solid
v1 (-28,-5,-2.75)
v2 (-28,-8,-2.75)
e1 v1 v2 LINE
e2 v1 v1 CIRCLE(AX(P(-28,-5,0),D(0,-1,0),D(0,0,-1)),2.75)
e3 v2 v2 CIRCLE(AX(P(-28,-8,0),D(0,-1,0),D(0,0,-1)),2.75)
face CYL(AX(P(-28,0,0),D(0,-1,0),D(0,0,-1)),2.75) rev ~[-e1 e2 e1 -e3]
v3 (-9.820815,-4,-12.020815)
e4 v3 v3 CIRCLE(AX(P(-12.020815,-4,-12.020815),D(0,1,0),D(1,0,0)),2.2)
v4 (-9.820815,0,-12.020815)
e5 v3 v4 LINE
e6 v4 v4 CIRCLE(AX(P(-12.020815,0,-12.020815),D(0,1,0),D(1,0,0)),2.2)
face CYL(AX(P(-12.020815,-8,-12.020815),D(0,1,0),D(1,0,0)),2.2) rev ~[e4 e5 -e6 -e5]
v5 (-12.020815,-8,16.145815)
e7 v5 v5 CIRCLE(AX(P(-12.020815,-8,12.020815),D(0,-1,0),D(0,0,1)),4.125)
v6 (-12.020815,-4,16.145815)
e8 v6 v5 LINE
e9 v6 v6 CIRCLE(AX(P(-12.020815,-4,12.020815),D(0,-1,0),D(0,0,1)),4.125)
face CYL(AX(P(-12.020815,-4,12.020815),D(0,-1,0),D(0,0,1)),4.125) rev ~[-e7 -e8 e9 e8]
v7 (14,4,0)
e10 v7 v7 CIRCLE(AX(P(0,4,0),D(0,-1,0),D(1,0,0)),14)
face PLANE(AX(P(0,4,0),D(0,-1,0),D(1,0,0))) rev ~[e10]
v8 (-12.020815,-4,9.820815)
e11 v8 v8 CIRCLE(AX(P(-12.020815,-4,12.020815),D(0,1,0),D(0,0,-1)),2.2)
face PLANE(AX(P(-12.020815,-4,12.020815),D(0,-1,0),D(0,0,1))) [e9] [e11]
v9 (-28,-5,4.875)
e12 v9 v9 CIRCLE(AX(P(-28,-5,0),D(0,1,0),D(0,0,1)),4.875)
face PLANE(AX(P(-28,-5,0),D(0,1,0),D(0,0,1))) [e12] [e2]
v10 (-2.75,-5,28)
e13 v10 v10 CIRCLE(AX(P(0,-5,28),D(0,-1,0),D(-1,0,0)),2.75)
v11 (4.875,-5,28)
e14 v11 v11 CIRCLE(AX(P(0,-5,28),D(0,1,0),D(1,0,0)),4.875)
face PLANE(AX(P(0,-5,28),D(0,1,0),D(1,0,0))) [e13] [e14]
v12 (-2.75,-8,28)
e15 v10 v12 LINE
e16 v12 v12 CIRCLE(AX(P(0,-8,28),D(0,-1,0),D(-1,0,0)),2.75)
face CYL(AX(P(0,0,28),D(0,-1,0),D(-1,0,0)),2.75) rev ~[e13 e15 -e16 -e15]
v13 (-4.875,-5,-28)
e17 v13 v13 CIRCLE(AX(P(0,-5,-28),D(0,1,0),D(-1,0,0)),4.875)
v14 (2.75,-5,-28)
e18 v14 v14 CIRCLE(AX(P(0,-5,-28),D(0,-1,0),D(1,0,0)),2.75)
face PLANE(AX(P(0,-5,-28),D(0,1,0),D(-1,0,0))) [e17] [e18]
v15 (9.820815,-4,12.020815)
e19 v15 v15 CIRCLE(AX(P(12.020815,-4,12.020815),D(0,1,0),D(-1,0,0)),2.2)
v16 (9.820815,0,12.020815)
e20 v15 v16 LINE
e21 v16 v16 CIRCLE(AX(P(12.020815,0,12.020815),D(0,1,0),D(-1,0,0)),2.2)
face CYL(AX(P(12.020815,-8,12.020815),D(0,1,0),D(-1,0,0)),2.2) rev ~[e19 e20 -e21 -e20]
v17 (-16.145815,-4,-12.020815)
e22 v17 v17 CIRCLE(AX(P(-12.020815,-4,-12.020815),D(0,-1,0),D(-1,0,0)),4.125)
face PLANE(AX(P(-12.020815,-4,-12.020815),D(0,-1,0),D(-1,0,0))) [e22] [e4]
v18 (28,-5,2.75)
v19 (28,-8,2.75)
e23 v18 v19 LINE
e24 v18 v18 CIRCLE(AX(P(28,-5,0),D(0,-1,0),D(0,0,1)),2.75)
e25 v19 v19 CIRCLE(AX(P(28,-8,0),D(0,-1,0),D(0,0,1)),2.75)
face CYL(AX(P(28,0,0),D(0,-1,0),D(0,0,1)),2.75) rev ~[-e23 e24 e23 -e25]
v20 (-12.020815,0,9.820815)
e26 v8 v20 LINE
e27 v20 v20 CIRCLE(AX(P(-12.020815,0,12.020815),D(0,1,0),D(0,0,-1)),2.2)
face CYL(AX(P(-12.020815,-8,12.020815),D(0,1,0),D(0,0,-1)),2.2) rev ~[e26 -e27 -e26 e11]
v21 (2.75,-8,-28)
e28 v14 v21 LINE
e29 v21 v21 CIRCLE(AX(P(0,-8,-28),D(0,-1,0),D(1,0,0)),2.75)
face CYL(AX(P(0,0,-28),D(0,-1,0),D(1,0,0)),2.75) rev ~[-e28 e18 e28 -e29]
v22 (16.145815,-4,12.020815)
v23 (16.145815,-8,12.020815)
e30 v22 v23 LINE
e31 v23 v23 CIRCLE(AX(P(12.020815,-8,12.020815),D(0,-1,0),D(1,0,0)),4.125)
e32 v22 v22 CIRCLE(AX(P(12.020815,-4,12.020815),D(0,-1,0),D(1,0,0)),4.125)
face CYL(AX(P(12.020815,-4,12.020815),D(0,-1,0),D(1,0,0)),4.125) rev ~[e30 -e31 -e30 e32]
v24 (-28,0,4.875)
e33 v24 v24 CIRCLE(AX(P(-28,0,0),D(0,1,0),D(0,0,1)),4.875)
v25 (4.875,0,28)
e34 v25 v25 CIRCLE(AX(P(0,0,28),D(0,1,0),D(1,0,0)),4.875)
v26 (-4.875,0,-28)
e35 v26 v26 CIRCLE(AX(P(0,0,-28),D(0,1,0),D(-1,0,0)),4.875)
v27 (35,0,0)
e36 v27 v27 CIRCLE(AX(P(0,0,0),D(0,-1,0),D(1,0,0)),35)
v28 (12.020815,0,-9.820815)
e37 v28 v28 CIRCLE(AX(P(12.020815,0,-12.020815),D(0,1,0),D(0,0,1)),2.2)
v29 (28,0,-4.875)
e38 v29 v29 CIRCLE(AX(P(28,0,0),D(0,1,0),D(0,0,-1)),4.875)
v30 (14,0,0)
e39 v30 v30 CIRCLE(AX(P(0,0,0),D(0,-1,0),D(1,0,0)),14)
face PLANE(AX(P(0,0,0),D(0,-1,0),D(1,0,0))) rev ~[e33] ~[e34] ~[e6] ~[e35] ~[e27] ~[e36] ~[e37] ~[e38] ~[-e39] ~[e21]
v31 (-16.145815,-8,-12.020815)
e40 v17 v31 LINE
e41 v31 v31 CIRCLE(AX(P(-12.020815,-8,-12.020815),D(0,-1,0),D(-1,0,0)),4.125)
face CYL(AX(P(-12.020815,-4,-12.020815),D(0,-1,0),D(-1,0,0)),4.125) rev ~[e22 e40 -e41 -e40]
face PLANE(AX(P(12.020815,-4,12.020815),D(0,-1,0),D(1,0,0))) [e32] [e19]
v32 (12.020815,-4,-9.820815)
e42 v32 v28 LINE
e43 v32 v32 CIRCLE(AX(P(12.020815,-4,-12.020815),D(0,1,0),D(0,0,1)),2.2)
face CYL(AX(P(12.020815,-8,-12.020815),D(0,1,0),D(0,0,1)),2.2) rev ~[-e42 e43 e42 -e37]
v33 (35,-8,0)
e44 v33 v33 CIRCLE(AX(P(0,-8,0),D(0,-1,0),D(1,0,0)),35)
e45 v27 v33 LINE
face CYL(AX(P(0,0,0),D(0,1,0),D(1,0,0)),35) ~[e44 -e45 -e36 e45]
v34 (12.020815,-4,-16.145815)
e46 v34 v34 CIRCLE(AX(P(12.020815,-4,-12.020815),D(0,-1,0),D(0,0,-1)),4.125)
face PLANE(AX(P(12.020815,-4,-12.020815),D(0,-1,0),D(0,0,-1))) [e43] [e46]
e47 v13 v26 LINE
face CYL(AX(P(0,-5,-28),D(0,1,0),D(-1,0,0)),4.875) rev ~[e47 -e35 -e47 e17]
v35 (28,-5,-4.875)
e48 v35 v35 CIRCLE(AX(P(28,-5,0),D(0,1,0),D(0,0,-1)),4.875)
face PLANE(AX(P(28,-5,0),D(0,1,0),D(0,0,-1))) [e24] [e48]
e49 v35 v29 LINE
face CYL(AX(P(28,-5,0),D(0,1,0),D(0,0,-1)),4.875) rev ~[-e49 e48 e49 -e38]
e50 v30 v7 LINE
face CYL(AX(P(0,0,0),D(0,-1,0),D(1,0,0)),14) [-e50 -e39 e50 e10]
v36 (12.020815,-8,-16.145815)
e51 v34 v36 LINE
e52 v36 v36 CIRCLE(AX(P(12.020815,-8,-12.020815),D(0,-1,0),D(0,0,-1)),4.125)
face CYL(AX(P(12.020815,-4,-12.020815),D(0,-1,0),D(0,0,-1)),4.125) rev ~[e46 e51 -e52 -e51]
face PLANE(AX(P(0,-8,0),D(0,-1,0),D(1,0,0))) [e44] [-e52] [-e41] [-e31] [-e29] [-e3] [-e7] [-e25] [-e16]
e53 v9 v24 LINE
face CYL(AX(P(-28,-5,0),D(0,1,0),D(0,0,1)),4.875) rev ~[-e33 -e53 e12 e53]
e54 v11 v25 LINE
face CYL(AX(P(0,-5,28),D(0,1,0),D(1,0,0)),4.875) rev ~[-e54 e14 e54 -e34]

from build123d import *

# Parameters (mm, degrees)
F0_R            = 35
F0_R_2          = 14
F1_DEPTH        = 8
F2_DEPTH        = 4
F4_D            = 4.4
F4_CBORE_D      = 8.25
F4_CBORE_DEPTH  = 4
F4_COPIES_COUNT = 4
F5_D            = 5.5
F5_CBORE_D      = 9.75
F5_CBORE_DEPTH  = 5
F5_COPIES_COUNT = 4


# Not quite as in the source:
# - a pattern or mirror of a feature is missing from the dataset's text; its kind, count and spacing are read off the source's solid


with BuildPart() as f1:
    # F0 (on Front) → F1 (new body)
    with BuildSketch(Plane.XZ):
        Circle(F0_R)
        Circle(F0_R_2, mode=Mode.SUBTRACT)
        Circle(F0_R_2)
    extrude(amount=F1_DEPTH)

    # F0 (on Front) → F2 (join)
    with BuildSketch(Plane.XZ):
        Circle(F0_R_2)
    extrude(amount=-F2_DEPTH)

    # F4 (through all)
    with Locations(Plane.XZ.offset(8)):
        with Locations((12.0208152802, 12.0208152802)):
            f4 = CounterBoreHole(F4_D / 2, F4_CBORE_D / 2, F4_CBORE_DEPTH)

    # F4_copies: F4 ×4 about axis
    f4_copies_axis = Axis((0, 0, 0), (0, 1, 0))
    for i in range(1, F4_COPIES_COUNT):
        add(f4.rotate(f4_copies_axis, i * 360 / F4_COPIES_COUNT), mode=Mode.SUBTRACT)

    # F5 (through all)
    with Locations(Plane(origin=(0, 0, 0), x_dir=(1, 0, 0), z_dir=(0, 1, 0))):
        with Locations((0, -28)):
            f5 = CounterBoreHole(F5_D / 2, F5_CBORE_D / 2, F5_CBORE_DEPTH)

    # F5_copies: F5 ×4 about axis
    f5_copies_axis = Axis((0, 0, 0), (0, 1, 0))
    for i in range(1, F5_COPIES_COUNT):
        add(f5.rotate(f5_copies_axis, i * 360 / F5_COPIES_COUNT), mode=Mode.SUBTRACT)


solid = f1.part
